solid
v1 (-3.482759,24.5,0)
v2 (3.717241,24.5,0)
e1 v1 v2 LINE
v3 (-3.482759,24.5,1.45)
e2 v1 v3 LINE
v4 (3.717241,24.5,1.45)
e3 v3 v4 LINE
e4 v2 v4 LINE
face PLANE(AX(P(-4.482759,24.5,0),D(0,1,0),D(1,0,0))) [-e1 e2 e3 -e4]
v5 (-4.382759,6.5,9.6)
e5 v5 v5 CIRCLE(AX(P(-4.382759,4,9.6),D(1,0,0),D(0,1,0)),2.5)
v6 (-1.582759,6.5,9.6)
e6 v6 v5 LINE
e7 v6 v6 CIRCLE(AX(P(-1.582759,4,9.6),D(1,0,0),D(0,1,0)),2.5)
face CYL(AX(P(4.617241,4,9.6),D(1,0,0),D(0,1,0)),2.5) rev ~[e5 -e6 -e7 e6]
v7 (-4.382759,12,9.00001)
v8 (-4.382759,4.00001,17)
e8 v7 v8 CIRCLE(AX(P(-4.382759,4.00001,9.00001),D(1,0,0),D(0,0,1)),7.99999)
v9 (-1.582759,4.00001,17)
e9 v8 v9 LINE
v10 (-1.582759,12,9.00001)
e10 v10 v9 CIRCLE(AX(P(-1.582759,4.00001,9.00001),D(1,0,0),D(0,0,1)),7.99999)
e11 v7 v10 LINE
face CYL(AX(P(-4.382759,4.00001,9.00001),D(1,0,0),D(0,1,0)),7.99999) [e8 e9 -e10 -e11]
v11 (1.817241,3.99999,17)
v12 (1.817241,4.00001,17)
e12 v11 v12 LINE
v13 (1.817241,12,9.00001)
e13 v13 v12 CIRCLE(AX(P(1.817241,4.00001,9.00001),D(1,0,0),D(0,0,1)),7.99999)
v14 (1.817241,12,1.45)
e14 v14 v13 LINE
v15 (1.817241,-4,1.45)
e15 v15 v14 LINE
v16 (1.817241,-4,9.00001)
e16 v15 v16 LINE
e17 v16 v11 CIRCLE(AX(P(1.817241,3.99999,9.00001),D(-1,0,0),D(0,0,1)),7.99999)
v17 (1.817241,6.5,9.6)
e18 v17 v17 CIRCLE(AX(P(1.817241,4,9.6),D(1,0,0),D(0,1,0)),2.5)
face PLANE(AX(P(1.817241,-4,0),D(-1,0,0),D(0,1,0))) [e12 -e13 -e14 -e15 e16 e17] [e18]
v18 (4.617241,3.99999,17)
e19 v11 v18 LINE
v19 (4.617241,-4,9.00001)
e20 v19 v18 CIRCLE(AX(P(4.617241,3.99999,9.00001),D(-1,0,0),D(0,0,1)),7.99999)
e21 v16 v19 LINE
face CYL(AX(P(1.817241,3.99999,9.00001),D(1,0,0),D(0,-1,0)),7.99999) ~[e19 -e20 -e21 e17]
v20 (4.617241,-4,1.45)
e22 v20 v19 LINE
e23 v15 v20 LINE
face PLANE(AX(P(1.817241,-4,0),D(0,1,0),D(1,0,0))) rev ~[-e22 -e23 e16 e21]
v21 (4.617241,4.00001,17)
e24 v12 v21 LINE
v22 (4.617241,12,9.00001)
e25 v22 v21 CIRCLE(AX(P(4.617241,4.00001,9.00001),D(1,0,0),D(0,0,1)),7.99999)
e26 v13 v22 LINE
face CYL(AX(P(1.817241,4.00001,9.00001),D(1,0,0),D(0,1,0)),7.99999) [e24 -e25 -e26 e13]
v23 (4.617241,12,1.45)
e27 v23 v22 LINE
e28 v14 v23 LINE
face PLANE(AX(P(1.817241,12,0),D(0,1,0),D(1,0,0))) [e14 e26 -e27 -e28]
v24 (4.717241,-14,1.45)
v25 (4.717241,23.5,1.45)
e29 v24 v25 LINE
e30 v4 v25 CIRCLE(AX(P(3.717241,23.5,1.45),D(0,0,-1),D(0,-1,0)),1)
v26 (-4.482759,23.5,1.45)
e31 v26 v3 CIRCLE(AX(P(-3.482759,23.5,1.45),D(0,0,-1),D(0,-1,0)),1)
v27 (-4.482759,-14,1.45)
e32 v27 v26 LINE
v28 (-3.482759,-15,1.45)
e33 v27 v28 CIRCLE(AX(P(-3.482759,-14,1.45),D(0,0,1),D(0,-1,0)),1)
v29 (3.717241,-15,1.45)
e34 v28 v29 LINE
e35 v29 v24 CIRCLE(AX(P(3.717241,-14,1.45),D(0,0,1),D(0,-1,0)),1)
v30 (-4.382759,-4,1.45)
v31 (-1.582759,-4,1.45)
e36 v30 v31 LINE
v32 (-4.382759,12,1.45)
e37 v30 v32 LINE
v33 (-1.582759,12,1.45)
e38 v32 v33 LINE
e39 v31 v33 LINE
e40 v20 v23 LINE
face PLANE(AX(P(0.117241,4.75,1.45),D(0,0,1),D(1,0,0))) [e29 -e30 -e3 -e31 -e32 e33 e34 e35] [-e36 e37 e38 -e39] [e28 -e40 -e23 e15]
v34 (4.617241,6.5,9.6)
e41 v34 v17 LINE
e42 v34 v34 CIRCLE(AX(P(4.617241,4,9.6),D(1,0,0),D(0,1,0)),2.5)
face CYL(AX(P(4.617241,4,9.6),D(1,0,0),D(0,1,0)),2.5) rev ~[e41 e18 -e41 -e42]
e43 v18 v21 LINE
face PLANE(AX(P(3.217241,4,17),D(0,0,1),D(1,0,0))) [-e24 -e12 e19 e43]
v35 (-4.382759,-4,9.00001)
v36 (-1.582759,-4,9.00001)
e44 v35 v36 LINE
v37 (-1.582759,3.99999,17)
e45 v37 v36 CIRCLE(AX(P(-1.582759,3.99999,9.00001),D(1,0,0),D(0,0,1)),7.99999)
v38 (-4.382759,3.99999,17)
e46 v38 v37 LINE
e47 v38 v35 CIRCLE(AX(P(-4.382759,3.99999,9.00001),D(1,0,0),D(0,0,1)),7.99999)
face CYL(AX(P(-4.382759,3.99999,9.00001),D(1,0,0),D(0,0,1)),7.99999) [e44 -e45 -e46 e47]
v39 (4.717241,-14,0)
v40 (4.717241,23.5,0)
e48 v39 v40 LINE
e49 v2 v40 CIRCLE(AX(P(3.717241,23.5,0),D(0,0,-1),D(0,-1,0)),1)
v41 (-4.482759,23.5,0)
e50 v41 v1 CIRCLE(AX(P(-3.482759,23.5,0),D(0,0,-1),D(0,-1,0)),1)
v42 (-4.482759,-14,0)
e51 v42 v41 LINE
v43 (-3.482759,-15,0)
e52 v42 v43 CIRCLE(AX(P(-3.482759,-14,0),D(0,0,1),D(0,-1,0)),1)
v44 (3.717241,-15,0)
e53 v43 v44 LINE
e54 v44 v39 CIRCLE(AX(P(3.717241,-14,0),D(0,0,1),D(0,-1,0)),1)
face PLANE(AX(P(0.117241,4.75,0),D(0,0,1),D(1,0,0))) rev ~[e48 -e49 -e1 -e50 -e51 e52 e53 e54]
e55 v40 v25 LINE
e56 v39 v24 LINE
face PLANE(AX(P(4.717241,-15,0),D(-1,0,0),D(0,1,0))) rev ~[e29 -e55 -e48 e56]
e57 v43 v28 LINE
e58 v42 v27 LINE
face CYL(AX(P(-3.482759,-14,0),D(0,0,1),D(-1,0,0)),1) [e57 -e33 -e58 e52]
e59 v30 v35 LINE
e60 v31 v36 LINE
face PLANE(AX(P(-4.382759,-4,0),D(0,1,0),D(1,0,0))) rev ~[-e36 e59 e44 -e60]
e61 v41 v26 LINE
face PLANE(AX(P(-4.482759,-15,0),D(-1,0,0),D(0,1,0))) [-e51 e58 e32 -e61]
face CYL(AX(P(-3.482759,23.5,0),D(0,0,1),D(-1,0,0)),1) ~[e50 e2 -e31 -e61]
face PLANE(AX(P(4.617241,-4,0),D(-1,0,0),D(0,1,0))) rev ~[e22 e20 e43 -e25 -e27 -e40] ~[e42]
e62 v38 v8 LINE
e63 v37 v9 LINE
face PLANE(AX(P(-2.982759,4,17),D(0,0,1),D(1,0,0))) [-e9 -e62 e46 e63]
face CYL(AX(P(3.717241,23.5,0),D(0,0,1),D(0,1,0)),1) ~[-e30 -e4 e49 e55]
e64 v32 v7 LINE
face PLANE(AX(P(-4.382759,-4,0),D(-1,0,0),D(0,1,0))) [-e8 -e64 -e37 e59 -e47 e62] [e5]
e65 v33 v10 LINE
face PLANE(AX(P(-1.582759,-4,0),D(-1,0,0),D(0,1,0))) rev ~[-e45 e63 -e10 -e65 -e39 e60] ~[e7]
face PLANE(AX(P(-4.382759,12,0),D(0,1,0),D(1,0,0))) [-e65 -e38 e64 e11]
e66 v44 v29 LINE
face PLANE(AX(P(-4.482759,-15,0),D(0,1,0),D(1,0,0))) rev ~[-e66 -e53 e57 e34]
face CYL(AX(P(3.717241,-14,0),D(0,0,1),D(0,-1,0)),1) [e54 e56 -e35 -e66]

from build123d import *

# Parameters (mm, degrees)
F0_W     = 9.2
F0_H     = 39.5
F0_W_2   = 2.8
F0_H_2   = 16
F1_DEPTH = 1.45
F2_DEPTH = 17
F3_R     = 7.99999
F4_R     = 2.5
F5_DEPTH = 25
F6_R     = 1


# Not quite as in the source:
# - a fillet or chamfer is up to 0.001 mm smaller than in the source, because OpenCascade refuses the exact size


with BuildPart() as f1:
    # F0 (on Top) → F1 (new body)
    with BuildSketch(Plane.XY):
        with Locations((0.1172406439, 4.75)):
            Rectangle(F0_W, F0_H)
        with Locations((-2.9827593561, 4)):
            Rectangle(F0_W_2, F0_H_2, mode=Mode.SUBTRACT)
        with Locations((3.2172406439, 4)):
            Rectangle(F0_W_2, F0_H_2, mode=Mode.SUBTRACT)
    extrude(amount=F1_DEPTH)

    # F0 (on Top) → F2 (join)
    with BuildSketch(Plane.XY):
        with Locations((-2.9827593561, 4)):
            Rectangle(F0_W_2, F0_H_2)
        with Locations((3.2172406439, 4)):
            Rectangle(F0_W_2, F0_H_2)
    extrude(amount=F2_DEPTH)

    # F3 (radius 8 in the source; OpenCascade refuses exactly that, so slightly less here)
    f3_edges = [f1.edges().sort_by_distance(p)[0] for p in [
        (-2.982759, 12, 17),
        (3.217241, 12, 17),
        (3.217241, -4, 17),
        (-2.982759, -4, 17),
    ]]
    fillet(f3_edges, radius=F3_R)

    # F4 (on face) → F5 (cut)
    with BuildSketch(Plane.YZ.offset(4.6172406439)):
        with Locations((4, 9.6)):
            Circle(F4_R)
    extrude(amount=-F5_DEPTH, mode=Mode.SUBTRACT)

    # F6
    f6_edges = [f1.edges().sort_by_distance(p)[0] for p in [
        (4.717241, 24.5, 0.725),
        (-4.482759, 24.5, 0.725),
        (4.717241, -15, 0.725),
        (-4.482759, -15, 0.725),
    ]]
    fillet(f6_edges, radius=F6_R)


solid = f1.part
